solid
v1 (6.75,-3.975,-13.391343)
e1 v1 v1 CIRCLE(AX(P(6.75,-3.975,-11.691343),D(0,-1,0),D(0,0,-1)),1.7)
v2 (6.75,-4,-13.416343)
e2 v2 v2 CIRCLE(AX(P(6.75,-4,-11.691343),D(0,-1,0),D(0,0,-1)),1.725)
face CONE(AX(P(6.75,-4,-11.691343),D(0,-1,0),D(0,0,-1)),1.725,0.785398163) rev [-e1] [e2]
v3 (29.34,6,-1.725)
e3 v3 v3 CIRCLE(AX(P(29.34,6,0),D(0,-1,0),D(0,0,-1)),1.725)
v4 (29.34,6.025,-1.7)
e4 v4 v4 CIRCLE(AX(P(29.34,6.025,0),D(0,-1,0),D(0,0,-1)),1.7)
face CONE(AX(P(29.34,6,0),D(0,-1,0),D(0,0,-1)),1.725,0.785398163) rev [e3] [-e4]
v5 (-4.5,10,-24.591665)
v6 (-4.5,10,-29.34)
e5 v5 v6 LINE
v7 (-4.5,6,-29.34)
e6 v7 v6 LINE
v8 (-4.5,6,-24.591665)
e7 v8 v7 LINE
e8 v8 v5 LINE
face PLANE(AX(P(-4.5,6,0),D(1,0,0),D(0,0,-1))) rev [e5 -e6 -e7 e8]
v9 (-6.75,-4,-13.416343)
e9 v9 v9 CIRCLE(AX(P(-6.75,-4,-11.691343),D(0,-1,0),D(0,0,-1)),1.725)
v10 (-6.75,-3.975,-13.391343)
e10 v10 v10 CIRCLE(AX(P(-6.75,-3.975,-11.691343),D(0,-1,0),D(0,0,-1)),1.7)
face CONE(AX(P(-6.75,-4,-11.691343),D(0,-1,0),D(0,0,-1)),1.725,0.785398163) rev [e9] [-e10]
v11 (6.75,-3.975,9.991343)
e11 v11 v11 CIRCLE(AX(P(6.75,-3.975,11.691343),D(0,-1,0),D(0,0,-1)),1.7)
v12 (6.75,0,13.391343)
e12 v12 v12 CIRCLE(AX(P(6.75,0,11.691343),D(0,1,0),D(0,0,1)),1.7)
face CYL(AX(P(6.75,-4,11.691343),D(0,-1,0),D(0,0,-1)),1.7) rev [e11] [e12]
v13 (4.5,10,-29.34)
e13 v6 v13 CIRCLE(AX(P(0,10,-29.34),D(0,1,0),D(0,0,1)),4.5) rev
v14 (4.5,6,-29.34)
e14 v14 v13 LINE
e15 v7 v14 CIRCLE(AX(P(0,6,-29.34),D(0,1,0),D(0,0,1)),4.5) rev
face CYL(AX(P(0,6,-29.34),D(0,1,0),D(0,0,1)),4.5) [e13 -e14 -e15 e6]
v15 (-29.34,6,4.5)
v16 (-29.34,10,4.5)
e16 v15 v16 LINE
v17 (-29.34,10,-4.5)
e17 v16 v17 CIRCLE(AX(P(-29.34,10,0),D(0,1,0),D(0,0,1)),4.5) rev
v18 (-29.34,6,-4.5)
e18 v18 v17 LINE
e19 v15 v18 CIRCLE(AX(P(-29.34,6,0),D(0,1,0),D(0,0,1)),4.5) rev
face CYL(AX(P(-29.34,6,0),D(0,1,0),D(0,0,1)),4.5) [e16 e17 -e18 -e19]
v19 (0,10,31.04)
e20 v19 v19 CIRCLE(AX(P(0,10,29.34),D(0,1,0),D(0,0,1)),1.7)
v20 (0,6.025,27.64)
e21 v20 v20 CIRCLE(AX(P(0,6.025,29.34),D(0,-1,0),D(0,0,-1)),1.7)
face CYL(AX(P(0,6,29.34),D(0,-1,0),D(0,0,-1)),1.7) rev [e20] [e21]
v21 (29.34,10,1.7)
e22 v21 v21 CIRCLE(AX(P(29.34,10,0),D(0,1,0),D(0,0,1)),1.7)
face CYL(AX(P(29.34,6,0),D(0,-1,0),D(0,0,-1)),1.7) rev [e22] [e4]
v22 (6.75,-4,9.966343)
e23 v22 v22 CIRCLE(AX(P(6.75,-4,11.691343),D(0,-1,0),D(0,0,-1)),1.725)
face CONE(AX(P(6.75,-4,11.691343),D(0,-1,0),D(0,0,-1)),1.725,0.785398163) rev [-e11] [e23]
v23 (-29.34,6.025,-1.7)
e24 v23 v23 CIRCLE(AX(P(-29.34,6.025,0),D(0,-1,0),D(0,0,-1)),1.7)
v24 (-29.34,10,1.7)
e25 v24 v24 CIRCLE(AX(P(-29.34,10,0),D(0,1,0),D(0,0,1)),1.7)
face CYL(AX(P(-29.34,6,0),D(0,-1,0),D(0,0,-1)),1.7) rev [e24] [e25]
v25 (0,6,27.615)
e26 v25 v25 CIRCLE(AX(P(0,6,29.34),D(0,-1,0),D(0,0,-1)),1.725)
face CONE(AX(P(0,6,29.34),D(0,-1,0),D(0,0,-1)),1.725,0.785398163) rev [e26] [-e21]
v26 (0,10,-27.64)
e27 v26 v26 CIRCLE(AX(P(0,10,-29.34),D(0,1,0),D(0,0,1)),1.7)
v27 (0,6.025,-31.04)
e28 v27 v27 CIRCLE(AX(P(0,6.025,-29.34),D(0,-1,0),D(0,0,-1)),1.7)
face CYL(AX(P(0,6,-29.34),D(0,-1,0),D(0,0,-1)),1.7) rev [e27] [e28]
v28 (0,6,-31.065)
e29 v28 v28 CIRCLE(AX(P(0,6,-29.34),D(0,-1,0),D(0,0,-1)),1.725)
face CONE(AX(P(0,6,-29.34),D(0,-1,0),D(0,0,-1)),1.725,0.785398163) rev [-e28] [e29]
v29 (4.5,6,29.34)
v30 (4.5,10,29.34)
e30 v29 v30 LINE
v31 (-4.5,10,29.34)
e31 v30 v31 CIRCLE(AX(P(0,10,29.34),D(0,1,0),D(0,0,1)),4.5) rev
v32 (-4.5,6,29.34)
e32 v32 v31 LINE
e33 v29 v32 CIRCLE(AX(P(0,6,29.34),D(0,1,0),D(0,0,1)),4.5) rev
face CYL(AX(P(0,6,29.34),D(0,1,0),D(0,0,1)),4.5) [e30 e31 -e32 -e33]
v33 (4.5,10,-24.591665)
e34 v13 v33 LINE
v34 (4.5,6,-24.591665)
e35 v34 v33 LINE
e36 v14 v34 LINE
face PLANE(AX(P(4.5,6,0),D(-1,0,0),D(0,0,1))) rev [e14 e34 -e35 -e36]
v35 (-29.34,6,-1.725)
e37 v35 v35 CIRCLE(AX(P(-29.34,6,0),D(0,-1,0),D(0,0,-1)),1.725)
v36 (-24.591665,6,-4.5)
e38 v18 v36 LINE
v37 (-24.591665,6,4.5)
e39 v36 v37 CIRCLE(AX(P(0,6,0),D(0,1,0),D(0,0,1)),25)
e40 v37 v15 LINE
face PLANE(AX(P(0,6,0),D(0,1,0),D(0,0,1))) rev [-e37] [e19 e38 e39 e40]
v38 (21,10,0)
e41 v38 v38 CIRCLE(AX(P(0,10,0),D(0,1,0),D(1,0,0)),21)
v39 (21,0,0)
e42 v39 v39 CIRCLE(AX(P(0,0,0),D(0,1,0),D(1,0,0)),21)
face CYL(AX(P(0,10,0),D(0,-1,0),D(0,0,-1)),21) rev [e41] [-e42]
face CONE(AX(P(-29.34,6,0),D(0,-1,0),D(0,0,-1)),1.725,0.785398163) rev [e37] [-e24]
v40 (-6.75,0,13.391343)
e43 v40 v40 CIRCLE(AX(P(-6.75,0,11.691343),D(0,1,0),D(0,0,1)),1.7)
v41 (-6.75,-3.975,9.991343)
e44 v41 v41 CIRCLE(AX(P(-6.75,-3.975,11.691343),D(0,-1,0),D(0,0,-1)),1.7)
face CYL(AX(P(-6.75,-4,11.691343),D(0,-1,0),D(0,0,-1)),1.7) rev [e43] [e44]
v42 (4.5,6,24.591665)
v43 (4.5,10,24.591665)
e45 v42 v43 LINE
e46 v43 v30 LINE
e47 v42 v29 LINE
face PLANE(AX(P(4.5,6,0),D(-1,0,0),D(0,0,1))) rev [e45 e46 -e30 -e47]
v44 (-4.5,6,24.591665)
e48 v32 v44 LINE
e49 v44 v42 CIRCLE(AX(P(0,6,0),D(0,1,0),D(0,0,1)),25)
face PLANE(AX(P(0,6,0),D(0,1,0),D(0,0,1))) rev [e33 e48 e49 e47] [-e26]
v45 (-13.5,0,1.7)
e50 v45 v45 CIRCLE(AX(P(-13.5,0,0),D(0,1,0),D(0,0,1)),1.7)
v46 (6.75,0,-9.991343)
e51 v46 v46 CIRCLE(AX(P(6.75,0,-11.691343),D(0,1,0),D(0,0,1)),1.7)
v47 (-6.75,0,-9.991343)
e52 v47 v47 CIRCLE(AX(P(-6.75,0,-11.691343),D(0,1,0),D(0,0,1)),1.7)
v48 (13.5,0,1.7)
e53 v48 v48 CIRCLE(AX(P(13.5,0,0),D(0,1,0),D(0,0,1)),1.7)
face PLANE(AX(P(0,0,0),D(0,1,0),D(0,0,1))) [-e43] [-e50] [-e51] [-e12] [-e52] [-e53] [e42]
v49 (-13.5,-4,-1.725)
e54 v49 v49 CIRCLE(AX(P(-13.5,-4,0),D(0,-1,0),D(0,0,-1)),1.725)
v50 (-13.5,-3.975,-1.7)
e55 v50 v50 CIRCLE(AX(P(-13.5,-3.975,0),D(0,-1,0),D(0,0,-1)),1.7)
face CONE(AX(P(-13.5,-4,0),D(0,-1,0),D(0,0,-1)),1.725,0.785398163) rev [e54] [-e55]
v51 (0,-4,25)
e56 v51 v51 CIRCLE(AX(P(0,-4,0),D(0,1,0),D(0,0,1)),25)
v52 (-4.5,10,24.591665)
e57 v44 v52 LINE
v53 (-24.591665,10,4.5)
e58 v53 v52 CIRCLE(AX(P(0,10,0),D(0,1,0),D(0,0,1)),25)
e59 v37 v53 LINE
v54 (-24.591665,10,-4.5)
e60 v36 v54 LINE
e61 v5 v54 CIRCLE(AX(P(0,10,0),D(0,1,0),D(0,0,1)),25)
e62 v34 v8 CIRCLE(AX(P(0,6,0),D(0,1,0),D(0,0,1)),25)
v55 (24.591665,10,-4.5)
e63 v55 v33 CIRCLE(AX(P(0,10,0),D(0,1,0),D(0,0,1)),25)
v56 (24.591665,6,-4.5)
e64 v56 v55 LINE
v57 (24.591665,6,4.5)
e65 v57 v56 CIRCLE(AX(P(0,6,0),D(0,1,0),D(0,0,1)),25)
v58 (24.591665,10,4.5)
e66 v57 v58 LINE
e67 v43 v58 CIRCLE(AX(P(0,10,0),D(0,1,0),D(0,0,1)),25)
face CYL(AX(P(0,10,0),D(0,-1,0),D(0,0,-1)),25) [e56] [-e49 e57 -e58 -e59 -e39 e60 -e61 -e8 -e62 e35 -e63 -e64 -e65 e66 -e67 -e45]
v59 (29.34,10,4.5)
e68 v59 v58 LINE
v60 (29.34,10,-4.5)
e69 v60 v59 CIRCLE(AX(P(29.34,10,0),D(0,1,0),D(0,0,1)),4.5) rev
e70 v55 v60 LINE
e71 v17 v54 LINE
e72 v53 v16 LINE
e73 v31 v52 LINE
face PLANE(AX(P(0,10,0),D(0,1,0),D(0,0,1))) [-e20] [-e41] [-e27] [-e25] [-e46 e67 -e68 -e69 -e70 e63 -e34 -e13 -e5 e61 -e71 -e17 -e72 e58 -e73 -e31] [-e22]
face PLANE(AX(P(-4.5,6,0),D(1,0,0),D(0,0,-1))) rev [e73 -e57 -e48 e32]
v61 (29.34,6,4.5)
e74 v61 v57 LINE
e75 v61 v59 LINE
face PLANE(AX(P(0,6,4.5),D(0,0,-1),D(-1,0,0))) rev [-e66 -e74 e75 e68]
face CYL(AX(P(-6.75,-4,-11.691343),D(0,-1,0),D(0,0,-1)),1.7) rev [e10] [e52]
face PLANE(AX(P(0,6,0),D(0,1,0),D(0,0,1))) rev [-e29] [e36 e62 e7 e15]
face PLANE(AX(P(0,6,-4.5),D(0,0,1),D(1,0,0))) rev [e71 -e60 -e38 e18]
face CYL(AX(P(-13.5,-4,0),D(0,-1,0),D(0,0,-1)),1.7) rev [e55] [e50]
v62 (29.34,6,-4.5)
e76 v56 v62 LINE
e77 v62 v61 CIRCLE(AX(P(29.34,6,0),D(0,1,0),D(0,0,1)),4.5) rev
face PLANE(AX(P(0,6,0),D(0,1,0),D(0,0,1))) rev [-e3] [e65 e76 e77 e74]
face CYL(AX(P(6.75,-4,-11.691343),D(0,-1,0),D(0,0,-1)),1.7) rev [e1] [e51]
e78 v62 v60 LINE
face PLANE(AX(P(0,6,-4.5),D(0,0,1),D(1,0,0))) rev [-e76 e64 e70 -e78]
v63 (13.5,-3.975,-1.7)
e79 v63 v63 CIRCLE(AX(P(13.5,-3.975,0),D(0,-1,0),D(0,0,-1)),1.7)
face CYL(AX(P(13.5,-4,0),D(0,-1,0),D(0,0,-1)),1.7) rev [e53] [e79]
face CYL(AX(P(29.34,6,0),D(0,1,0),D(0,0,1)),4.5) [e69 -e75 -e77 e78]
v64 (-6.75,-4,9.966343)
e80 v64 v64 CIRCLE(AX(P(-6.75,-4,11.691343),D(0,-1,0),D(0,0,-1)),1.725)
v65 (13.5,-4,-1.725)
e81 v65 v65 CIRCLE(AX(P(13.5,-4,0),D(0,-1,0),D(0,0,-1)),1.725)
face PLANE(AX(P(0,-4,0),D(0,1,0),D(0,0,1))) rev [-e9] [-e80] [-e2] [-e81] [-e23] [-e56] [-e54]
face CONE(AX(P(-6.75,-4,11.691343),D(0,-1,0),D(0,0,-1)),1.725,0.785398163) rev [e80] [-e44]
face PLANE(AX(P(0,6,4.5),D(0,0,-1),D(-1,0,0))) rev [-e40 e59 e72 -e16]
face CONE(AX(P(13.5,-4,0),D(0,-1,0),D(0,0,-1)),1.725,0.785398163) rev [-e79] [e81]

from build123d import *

# Parameters (mm, degrees)
SKETCH_1_R                   = 25
SKETCH_1_R_2                 = 21
EXTRUDE_1_DEPTH              = 10
EXTRUDE_START                = -4
SKETCH_1_5_R                 = 25
EXTRUDE_2_DEPTH              = 4
EXTRUDE_3_DEPTH              = 4
PATTERN_CIRCULAR_1_COUNT     = 6
HOLE_WIZARD_M3_2_D           = 3.4
HOLE_WIZARD_M3_2_CSINK_D     = 3.45
HOLE_WIZARD_M3_2_CSINK_ANGLE = 90


# Read off the part's stored shape, not the designer's step: M3 间隙孔1
with BuildPart() as part:
    # 草图1 → 拉伸-薄壁1 (new body)
    with BuildSketch(Plane(origin=(0, 0, 0), x_dir=(1, 0, 0), z_dir=(0, 1, 0))):
        Circle(SKETCH_1_R)
        Circle(SKETCH_1_R_2, mode=Mode.SUBTRACT)
    extrude(amount=EXTRUDE_1_DEPTH)

    # 草图1<5> → 凸台-拉伸2 (add)
    with BuildSketch(Plane(origin=(0, 0, 0), x_dir=(1, 0, 0), z_dir=(0, 1, 0)).offset(EXTRUDE_START)):
        with Locations(Location((0, 0, 0), (0, 0, 270))):
            Circle(SKETCH_1_5_R)
    extrude(amount=EXTRUDE_2_DEPTH)

    # 草图3 → 凸台-拉伸3 (add)
    with BuildSketch(Plane(origin=(0, 10, 0), x_dir=(1, 0, 0), z_dir=(0, 1, 0)).offset(EXTRUDE_START)):
        with BuildLine():
            ThreePointArc((-29.34, 4.5), (-33.84, 0), (-29.34, -4.5))
            Line((-29.34, -4.5), (-24.591665255, -4.5))
            ThreePointArc((-24.591665255, -4.5), (-25, 0), (-24.591665255, 4.5))
            Line((-24.591665255, 4.5), (-29.34, 4.5))
        make_face()
        with BuildLine():
            ThreePointArc((24.591665255, 4.5), (24.897707037, 2.259244191), (25, 0))
            ThreePointArc((25, 0), (24.897707037, -2.259244191), (24.591665255, -4.5))
            Line((24.591665255, -4.5), (29.34, -4.5))
            ThreePointArc((29.34, -4.5), (33.84, 0), (29.34, 4.5))
            Line((29.34, 4.5), (24.591665255, 4.5))
        make_face()
        with BuildLine():
            Line((-4.5, 29.34), (-4.5, 24.591665255))
            ThreePointArc((-4.5, 24.591665255), (0, 25), (4.5, 24.591665255))
            Line((4.5, 24.591665255), (4.5, 29.34))
            ThreePointArc((4.5, 29.34), (0, 33.84), (-4.5, 29.34))
        make_face()
        with BuildLine():
            ThreePointArc((4.5, -24.591665255), (0, -25), (-4.5, -24.591665255))
            Line((-4.5, -24.591665255), (-4.5, -29.34))
            ThreePointArc((-4.5, -29.34), (0, -33.84), (4.5, -29.34))
            Line((4.5, -29.34), (4.5, -24.591665255))
        make_face()
    extrude(amount=EXTRUDE_3_DEPTH)

    # M3 间隙孔1 outline → M3 间隙孔1 (revolve, cut)
    with BuildSketch(Plane(origin=(-13.5, 0, 0), x_dir=(1, 0, 0), z_dir=(0, 0, 1))):
        Polygon((1.7, -3.975), (1.7, 0), (0, 0), (0, -4), (1.725, -4), align=None)
    hole_wizard_m3_1 = revolve(axis=Axis((-13.5, 0, 0), (0, 1, 0)), mode=Mode.SUBTRACT)

    # 阵列(圆周)1: M3 间隙孔1 ×6 about axis
    pattern_circular_1_axis = Axis((0, 0, 0), (0, 1, 0))
    for i in range(1, PATTERN_CIRCULAR_1_COUNT):
        add(hole_wizard_m3_1.rotate(pattern_circular_1_axis, i * 360 / PATTERN_CIRCULAR_1_COUNT), mode=Mode.SUBTRACT)

    # M3 间隙孔2 (through all)
    with Locations(Plane(origin=(0, 6, 0), x_dir=(-1, 0, 0), z_dir=(0, -1, 0))):
        with Locations((0, 29.34), (29.34, 0), (0, -29.34), (-29.34, 0)):
            CounterSinkHole(HOLE_WIZARD_M3_2_D / 2, HOLE_WIZARD_M3_2_CSINK_D / 2, counter_sink_angle=HOLE_WIZARD_M3_2_CSINK_ANGLE)


solid = part.part
